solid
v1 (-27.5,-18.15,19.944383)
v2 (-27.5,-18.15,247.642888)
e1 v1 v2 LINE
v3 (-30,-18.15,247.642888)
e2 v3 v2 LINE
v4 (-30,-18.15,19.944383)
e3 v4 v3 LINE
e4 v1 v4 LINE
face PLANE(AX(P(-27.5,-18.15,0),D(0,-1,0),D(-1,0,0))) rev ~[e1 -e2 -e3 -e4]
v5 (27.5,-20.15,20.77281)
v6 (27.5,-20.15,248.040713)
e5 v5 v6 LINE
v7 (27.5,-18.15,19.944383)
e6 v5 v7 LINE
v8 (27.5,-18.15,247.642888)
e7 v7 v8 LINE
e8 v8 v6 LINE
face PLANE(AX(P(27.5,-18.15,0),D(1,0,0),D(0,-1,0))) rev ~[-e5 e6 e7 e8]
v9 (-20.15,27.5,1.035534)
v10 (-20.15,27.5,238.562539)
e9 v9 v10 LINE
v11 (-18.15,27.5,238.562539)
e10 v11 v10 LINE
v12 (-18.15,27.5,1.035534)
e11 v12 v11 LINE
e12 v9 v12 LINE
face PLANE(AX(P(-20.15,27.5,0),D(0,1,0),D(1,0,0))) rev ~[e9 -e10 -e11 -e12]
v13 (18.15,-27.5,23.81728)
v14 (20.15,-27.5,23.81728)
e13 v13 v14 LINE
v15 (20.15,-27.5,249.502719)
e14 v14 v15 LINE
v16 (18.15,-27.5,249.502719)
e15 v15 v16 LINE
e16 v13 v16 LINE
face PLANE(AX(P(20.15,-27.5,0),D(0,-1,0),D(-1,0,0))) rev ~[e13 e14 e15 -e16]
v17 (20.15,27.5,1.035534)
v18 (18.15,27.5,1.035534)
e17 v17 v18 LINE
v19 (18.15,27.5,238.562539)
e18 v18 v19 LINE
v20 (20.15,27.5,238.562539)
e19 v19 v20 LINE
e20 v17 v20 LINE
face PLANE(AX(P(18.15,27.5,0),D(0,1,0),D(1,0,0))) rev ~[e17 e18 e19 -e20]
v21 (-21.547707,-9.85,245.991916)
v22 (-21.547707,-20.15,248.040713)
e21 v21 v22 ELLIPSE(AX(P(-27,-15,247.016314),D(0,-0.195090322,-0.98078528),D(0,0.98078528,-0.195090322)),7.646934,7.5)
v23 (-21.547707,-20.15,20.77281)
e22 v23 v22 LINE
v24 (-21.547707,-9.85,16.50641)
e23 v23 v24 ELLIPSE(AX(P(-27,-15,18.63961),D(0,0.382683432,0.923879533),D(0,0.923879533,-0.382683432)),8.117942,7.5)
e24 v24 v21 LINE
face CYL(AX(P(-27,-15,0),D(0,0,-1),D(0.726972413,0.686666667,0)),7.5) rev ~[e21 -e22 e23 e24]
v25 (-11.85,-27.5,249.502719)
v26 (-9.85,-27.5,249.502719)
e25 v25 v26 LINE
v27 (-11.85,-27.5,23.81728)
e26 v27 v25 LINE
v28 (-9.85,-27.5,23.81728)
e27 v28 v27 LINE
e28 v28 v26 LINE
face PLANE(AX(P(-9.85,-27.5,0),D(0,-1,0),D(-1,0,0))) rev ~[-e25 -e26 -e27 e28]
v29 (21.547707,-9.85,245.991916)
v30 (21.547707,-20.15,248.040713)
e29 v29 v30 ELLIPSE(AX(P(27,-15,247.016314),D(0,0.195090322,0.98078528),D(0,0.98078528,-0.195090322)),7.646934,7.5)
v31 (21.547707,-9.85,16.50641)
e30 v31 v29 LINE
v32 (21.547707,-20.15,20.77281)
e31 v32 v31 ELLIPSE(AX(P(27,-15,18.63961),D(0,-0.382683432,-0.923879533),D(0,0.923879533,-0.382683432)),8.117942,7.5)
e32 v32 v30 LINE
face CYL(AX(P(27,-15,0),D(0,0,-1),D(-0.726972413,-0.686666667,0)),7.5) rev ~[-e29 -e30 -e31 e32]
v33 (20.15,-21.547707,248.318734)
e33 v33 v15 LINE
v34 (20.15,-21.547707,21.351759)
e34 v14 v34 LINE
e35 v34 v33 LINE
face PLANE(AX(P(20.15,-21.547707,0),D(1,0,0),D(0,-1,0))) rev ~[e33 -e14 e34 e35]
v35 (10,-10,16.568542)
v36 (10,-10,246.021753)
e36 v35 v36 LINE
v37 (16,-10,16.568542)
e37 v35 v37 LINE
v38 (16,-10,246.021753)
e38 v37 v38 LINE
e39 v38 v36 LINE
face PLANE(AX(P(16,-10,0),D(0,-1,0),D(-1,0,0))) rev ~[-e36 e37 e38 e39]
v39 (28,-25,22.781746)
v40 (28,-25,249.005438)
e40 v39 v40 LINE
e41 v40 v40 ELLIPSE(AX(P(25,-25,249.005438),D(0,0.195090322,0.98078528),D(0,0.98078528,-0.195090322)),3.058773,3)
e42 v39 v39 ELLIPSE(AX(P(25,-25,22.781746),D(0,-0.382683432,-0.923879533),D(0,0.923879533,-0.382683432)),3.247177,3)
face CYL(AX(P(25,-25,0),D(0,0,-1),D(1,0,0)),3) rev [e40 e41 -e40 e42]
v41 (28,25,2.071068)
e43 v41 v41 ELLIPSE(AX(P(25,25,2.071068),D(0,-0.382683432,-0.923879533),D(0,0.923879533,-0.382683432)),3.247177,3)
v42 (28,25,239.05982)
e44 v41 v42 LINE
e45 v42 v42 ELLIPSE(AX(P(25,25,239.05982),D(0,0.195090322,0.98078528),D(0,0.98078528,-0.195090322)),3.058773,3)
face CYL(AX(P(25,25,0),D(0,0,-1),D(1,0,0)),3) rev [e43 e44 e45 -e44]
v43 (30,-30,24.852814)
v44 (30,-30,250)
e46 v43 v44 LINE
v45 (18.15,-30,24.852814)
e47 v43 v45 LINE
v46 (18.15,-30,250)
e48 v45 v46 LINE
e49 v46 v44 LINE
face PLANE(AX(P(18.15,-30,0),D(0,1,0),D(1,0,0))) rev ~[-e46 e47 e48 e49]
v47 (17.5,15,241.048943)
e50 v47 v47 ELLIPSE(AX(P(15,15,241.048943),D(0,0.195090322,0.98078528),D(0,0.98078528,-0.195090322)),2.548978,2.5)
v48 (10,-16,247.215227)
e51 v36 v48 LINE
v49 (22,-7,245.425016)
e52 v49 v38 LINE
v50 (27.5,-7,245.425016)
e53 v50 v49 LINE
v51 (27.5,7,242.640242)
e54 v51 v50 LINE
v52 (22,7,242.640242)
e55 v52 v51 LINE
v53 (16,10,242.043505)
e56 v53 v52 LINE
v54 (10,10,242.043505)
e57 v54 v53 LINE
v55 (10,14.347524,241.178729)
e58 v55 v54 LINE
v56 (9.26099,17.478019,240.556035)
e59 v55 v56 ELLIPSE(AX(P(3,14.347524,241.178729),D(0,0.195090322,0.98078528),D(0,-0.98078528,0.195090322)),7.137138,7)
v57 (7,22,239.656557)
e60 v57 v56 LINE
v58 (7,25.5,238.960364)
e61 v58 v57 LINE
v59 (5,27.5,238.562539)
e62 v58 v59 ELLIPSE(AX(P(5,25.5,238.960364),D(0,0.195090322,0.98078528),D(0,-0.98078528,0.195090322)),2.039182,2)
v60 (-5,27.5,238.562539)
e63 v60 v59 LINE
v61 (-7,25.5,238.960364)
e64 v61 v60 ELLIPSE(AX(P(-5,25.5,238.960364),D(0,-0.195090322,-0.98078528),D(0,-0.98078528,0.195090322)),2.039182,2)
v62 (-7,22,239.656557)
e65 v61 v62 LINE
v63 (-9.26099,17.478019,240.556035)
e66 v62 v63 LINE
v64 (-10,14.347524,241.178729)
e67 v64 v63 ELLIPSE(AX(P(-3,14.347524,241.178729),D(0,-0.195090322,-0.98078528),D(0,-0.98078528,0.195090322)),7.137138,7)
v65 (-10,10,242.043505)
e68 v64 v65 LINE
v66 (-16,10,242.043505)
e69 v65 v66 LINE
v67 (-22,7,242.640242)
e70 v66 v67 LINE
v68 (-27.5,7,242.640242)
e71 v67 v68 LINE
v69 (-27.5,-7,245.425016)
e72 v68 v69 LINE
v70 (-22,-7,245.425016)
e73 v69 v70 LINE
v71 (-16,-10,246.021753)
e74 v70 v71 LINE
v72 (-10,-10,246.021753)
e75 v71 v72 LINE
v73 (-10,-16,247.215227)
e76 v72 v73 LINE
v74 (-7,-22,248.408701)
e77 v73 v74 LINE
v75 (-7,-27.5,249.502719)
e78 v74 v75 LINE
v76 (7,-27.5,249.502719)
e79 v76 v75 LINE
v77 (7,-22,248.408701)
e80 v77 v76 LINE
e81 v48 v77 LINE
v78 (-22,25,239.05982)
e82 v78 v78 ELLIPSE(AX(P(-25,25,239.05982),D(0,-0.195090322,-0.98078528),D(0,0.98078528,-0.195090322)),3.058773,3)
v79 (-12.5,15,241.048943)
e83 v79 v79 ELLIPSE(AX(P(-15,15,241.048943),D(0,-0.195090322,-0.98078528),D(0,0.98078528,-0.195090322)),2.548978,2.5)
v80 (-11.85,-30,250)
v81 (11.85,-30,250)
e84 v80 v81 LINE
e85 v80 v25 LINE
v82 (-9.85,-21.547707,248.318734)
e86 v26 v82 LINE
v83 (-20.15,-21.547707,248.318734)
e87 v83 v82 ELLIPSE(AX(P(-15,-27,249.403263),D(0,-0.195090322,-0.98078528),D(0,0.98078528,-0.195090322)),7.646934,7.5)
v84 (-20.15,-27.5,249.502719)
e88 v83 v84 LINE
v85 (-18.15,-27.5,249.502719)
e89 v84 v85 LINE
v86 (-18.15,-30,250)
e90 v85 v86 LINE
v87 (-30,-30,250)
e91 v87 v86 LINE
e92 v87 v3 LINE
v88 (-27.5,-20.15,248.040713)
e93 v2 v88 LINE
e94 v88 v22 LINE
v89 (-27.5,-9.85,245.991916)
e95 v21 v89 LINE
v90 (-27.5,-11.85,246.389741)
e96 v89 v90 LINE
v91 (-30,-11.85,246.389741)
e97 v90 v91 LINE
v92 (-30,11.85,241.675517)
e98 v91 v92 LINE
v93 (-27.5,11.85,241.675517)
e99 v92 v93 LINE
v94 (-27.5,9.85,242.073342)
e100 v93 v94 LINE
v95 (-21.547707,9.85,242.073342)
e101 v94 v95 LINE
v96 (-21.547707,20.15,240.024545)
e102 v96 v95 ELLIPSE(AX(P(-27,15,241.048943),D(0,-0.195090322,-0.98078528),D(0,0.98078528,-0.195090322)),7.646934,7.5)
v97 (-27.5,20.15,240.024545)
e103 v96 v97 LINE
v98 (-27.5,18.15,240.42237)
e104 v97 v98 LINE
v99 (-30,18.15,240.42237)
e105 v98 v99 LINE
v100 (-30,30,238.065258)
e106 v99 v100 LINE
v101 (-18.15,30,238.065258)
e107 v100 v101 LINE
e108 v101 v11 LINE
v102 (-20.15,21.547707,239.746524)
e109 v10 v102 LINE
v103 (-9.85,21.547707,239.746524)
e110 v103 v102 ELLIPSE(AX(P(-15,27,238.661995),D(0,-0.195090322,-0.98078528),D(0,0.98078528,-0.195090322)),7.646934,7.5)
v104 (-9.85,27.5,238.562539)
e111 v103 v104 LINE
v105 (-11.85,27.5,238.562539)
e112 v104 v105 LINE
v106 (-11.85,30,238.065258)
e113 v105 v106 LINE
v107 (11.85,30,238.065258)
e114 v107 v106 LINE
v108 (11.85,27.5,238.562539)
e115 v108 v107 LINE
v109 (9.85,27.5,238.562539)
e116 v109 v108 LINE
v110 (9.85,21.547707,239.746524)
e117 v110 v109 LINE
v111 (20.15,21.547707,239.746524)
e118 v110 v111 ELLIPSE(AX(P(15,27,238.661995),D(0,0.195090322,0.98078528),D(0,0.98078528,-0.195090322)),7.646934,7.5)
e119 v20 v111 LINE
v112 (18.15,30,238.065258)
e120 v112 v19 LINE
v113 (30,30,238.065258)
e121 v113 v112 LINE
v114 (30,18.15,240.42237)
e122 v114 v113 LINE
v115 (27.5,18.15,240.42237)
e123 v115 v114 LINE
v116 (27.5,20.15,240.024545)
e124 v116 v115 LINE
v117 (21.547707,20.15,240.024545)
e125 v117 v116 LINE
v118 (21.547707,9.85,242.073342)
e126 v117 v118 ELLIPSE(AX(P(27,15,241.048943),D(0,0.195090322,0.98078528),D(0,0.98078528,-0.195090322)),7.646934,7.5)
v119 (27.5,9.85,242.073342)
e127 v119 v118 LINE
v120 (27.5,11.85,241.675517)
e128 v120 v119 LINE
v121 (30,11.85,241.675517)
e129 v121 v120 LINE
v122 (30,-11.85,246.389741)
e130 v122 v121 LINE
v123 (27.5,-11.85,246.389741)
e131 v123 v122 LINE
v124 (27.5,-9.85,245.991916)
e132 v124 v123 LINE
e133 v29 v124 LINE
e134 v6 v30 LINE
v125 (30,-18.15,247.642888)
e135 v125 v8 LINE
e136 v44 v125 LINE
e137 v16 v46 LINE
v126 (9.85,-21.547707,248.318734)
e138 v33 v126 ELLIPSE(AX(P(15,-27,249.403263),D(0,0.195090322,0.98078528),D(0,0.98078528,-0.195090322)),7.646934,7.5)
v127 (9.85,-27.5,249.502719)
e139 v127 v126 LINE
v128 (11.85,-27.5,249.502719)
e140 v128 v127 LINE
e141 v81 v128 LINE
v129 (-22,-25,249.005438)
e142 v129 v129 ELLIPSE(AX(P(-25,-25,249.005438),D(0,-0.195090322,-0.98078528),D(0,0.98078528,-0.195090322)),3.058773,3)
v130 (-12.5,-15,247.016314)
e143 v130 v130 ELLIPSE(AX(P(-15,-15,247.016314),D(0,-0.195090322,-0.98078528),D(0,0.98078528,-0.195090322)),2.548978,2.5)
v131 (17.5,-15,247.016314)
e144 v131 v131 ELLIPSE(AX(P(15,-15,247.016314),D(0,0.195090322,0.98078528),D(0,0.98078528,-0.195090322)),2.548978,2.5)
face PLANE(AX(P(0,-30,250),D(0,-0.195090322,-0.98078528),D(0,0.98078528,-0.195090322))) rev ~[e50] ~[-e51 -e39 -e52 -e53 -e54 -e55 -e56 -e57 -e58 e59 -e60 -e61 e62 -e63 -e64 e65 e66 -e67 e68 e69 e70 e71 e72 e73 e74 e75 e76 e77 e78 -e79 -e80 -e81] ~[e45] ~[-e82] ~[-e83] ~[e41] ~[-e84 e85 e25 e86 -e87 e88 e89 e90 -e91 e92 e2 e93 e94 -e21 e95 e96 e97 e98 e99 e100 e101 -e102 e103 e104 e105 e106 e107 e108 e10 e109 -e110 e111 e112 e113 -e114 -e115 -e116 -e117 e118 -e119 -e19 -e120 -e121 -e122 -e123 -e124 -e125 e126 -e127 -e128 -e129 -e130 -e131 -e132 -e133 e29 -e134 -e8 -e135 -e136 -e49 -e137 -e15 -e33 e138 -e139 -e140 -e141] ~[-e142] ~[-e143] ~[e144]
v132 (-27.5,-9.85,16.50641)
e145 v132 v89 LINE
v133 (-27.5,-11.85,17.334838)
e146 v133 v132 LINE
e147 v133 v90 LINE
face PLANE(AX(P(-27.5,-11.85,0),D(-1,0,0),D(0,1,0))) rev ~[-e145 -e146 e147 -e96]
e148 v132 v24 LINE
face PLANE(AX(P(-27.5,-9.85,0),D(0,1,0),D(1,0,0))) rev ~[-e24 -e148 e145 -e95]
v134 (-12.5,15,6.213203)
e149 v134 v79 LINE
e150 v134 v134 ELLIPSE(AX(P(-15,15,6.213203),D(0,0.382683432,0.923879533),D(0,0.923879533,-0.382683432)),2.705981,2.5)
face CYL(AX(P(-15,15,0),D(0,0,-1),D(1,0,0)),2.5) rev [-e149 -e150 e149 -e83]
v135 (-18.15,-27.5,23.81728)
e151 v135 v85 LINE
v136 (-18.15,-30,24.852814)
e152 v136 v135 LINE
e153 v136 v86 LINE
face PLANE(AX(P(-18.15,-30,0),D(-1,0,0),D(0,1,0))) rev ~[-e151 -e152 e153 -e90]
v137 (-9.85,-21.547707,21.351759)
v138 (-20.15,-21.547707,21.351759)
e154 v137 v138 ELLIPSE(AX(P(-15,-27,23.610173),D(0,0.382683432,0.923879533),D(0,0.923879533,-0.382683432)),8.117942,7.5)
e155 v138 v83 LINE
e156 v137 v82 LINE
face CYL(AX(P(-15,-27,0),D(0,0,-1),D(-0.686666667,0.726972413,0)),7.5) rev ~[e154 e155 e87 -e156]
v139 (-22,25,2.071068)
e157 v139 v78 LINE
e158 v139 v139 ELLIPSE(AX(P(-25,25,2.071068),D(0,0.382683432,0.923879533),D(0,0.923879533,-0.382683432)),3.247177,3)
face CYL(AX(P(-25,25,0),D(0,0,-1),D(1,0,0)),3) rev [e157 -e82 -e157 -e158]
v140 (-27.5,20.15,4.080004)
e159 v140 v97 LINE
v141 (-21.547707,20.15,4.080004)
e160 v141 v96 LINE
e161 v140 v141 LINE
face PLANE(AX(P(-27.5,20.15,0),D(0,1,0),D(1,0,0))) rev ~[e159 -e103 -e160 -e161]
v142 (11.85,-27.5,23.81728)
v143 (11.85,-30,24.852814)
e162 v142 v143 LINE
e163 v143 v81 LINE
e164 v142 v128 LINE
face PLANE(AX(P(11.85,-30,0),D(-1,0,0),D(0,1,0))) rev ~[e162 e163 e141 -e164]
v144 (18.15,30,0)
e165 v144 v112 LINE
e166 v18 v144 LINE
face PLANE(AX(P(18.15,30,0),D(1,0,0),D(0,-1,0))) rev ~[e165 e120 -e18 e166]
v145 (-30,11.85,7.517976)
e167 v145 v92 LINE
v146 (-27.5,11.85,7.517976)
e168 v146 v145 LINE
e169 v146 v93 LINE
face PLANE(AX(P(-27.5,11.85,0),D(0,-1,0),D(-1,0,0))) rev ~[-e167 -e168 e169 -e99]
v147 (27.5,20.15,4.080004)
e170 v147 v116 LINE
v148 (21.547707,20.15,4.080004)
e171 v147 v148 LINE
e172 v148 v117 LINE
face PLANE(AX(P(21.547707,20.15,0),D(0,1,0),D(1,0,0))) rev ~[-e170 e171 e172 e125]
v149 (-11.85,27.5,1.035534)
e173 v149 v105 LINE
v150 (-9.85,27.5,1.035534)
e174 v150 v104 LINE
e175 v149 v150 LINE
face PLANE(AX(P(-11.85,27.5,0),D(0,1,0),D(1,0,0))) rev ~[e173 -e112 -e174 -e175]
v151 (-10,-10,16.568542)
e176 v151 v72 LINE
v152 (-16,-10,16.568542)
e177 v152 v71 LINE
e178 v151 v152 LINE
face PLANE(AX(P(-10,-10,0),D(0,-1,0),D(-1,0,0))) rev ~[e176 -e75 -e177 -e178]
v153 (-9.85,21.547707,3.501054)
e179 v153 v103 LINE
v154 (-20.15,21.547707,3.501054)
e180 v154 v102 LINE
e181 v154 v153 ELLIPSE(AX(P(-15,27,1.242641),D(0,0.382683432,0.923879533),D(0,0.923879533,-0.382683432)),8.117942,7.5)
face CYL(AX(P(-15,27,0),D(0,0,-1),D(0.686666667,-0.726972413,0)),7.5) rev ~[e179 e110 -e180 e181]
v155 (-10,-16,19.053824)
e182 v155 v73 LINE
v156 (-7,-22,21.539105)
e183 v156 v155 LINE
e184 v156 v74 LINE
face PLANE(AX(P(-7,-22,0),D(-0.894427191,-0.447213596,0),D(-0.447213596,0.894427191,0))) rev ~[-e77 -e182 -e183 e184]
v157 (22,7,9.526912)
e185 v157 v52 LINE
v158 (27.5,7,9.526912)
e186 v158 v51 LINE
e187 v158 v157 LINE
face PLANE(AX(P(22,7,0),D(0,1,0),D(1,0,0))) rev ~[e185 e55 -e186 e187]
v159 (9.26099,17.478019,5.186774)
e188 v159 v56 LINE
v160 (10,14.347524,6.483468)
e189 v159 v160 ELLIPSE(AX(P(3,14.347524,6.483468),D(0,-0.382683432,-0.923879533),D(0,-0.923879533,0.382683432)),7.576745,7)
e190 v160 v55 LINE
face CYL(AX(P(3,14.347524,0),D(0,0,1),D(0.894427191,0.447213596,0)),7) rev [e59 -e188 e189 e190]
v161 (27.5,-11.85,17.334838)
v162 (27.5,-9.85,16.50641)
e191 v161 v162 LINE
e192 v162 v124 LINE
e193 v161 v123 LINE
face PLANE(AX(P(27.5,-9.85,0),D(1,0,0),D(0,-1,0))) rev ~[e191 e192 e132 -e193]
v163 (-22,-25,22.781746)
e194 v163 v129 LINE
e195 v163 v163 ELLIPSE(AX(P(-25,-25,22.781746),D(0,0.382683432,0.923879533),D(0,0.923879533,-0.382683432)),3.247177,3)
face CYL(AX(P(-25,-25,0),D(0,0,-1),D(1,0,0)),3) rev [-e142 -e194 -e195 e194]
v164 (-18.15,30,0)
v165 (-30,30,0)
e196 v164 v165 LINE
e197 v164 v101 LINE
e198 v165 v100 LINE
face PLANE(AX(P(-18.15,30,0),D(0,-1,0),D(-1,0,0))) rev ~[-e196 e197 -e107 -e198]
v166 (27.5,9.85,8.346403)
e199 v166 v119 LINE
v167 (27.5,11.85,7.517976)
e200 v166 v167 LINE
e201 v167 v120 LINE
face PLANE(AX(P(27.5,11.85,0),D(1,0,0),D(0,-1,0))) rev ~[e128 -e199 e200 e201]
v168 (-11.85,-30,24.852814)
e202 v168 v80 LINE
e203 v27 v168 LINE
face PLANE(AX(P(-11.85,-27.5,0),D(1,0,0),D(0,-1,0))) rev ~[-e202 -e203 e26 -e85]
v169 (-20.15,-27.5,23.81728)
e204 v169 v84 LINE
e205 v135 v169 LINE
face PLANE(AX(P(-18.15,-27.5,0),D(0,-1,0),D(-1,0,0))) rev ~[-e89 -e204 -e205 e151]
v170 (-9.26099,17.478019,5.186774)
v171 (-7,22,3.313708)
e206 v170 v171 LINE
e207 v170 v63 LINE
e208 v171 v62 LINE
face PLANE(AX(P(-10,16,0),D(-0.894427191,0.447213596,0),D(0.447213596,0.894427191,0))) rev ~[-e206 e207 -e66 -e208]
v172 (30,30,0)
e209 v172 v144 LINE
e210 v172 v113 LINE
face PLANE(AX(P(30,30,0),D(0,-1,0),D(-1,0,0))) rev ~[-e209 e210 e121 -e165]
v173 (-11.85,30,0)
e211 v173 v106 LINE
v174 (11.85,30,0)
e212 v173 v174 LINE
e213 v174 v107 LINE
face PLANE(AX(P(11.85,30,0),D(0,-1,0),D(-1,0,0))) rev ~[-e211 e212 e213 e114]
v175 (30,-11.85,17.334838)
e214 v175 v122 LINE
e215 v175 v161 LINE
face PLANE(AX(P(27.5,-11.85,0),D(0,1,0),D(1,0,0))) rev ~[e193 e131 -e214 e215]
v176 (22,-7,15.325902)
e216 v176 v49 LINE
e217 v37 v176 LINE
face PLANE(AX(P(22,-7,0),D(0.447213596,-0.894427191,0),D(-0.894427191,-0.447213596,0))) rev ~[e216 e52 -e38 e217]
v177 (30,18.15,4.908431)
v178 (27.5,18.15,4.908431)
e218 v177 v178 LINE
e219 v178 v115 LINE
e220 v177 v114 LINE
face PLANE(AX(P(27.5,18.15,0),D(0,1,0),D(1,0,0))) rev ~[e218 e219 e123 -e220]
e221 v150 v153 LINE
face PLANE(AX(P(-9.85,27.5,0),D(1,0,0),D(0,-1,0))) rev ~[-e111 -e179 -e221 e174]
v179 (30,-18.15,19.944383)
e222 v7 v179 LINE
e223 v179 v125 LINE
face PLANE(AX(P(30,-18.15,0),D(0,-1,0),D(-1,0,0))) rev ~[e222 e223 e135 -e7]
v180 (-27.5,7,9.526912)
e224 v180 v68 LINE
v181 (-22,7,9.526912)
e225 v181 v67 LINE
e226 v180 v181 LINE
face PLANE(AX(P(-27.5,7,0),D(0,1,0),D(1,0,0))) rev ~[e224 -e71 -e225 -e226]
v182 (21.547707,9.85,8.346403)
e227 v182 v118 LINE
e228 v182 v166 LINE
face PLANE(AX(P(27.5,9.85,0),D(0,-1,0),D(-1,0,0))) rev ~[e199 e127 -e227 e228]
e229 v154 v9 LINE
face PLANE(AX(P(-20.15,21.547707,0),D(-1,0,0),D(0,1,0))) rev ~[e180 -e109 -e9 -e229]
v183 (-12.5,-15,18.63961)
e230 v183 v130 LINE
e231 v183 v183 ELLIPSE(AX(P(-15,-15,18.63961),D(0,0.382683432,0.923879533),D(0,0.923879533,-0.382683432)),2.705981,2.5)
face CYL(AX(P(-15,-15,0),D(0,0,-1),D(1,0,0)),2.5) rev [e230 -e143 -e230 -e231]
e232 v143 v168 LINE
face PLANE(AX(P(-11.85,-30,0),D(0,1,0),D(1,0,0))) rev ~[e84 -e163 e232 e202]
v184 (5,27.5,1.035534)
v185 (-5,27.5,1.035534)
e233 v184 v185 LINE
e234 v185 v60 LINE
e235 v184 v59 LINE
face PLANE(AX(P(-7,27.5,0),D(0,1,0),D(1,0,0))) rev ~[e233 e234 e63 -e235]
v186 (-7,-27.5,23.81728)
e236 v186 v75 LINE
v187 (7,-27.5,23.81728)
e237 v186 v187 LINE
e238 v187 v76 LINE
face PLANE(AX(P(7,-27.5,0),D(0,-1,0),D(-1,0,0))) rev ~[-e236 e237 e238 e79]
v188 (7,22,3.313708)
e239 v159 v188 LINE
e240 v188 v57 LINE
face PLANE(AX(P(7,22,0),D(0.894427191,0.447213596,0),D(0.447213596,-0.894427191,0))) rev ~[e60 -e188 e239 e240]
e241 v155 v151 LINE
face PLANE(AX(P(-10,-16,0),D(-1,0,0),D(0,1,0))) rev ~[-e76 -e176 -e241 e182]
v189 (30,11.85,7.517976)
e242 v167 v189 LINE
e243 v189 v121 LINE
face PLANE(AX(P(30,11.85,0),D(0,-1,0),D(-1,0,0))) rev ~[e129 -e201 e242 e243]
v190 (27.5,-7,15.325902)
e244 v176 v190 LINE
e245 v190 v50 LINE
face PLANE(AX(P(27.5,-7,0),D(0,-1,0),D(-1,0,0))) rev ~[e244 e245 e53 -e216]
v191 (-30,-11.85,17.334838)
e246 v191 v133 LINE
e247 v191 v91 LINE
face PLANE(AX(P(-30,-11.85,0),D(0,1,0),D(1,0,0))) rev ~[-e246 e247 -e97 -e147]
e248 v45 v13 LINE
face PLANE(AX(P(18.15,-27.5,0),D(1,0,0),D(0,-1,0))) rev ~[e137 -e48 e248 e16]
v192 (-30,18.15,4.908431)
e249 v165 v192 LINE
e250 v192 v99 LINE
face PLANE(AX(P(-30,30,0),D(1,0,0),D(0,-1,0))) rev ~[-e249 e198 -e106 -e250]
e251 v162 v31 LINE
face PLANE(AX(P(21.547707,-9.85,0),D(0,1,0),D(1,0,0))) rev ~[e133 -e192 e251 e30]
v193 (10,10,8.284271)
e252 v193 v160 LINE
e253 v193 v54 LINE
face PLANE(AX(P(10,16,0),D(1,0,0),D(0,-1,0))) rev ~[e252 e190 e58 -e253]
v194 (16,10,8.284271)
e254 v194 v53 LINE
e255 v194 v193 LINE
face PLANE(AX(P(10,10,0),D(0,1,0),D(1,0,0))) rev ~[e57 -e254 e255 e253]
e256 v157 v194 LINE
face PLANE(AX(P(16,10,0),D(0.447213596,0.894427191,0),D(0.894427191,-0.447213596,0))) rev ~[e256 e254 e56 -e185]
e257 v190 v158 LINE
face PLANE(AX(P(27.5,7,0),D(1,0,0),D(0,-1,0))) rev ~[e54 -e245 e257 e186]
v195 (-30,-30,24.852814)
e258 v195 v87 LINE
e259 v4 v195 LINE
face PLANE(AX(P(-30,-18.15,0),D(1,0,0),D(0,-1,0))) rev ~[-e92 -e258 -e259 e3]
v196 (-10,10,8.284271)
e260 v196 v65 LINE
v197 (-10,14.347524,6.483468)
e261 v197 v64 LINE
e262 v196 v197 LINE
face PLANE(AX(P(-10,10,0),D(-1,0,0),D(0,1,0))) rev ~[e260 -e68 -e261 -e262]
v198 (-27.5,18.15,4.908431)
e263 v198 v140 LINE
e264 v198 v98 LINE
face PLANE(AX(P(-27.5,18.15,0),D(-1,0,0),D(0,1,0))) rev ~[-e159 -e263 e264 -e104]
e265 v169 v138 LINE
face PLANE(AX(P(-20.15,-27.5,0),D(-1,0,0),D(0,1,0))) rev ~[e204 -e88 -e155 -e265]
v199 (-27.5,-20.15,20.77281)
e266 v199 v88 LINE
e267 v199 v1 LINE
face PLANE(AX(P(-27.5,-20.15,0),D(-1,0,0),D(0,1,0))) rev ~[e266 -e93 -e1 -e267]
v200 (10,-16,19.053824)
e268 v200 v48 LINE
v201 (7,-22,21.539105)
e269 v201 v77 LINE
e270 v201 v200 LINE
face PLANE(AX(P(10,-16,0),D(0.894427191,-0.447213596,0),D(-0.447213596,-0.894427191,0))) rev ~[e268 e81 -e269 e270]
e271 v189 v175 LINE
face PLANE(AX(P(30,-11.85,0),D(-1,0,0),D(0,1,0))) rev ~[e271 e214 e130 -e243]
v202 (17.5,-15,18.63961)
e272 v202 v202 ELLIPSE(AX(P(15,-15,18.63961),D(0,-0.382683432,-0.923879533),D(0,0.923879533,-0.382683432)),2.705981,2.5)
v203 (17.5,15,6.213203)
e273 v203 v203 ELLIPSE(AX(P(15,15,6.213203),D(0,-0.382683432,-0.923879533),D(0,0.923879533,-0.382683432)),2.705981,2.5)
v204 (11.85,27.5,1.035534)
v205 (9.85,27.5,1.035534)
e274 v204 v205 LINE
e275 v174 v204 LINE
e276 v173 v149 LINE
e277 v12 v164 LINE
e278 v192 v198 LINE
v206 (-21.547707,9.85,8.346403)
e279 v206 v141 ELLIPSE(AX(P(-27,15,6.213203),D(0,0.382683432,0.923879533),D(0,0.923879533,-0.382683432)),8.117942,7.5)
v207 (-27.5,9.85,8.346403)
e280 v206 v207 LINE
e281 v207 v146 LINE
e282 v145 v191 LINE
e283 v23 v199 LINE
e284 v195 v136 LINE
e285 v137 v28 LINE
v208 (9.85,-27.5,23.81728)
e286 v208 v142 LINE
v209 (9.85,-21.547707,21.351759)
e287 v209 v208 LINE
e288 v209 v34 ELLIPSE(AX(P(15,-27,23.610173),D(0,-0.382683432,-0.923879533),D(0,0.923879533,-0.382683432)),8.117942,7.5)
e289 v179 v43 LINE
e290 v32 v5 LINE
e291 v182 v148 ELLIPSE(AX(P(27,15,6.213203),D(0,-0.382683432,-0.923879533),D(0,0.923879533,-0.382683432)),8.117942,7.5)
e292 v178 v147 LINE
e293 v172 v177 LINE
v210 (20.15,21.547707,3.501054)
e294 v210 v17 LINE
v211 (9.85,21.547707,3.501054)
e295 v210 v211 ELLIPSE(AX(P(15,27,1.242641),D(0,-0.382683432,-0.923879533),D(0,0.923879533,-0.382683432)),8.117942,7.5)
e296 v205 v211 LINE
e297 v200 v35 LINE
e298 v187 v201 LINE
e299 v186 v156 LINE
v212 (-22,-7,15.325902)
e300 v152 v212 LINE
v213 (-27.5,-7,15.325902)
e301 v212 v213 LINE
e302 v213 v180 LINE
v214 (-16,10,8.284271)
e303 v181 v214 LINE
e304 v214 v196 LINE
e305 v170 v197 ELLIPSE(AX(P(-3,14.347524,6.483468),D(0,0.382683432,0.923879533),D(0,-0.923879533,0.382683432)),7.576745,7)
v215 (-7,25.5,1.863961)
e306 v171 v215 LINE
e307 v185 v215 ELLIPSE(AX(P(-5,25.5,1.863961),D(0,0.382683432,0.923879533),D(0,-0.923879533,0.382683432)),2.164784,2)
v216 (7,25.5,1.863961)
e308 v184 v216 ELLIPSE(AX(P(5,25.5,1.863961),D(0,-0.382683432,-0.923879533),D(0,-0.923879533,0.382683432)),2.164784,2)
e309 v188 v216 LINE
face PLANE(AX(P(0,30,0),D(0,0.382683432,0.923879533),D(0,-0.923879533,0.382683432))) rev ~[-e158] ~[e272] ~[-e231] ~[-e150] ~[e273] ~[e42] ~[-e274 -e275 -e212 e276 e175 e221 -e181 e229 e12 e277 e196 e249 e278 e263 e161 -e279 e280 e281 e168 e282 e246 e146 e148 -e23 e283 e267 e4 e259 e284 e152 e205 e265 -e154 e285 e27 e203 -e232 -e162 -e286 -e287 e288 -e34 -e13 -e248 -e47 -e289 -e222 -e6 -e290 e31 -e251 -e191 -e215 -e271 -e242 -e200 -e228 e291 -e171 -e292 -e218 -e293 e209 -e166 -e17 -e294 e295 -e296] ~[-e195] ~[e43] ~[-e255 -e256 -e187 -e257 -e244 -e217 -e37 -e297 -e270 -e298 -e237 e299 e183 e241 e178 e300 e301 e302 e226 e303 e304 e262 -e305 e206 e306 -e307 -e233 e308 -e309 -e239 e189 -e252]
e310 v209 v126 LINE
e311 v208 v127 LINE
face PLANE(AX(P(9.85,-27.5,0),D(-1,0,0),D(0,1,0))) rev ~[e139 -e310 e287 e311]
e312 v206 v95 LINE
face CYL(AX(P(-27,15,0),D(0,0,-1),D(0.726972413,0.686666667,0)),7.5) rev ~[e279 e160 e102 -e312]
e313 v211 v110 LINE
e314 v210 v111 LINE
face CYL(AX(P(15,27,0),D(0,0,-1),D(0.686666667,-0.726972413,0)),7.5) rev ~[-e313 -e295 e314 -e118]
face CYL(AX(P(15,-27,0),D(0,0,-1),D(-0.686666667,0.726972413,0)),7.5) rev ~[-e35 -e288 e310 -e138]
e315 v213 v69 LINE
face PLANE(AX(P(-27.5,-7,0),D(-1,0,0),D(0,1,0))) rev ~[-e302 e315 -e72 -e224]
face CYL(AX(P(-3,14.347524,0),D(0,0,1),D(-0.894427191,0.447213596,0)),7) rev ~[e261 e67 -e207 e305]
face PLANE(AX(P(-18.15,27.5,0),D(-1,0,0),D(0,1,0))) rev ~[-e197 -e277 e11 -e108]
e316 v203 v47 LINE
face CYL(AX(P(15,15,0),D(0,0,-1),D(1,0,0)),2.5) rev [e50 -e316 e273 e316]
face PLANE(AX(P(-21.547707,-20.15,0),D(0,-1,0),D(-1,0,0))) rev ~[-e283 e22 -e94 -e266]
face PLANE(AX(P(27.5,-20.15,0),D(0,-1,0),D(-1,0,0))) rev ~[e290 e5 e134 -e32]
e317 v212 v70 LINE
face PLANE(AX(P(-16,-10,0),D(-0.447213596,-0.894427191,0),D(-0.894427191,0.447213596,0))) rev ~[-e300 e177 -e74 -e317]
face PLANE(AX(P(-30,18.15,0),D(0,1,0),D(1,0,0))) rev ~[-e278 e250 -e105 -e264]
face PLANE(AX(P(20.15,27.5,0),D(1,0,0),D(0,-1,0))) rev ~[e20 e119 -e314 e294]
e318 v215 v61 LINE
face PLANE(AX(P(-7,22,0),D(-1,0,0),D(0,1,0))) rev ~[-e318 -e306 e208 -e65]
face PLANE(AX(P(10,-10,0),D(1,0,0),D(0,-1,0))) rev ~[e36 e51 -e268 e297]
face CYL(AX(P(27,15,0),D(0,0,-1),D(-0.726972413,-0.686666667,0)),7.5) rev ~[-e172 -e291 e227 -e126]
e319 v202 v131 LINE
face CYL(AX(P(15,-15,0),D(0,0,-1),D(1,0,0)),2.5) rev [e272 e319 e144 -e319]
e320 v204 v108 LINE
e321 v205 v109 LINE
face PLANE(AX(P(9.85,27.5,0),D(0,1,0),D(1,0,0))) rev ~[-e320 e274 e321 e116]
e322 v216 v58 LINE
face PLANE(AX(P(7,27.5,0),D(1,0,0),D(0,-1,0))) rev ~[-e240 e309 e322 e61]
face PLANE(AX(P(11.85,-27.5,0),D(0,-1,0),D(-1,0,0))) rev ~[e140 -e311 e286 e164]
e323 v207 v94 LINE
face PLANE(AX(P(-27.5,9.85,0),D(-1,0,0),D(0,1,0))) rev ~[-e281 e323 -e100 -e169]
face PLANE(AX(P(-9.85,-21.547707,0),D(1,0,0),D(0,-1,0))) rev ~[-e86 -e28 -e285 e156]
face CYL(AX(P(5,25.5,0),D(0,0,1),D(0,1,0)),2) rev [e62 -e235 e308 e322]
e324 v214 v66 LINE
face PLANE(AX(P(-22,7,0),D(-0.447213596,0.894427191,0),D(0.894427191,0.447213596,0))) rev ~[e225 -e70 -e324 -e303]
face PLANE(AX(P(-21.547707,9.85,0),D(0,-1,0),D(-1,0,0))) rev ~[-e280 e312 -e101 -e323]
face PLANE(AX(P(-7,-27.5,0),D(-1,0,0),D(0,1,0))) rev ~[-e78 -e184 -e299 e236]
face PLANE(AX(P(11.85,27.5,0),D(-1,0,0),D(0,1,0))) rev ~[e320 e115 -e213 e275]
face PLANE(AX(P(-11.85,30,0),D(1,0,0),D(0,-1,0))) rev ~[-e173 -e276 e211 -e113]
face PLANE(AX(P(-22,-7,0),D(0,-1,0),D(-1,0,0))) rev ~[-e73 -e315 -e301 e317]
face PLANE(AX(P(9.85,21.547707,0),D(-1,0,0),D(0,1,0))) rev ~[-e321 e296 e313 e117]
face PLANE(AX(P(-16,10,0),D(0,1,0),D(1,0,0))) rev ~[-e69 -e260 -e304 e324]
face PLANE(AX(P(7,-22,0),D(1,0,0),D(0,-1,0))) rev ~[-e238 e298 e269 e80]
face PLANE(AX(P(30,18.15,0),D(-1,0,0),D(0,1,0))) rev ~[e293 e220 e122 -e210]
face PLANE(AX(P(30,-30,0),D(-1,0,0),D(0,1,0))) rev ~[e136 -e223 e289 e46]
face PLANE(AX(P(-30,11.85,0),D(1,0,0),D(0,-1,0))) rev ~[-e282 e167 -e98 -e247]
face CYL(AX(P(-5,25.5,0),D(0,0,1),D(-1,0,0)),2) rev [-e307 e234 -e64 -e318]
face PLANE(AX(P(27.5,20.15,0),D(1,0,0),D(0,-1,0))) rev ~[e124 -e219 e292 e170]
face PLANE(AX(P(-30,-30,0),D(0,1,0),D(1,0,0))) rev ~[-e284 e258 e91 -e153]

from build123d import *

# Parameters (mm, degrees)
F0_R          = 3
F0_R_2        = 2.5
F1_DEPTH      = 250
F2_R          = 2
F3_R          = 7
F5_DEPTH      = 30
F5_DEPTH_BACK = 30


# Not quite as in the source:
# - a feature names something its author has since deleted; it is built from what else it names


with BuildPart() as f1:
    # F0 (on Top) → F1 (new body)
    with BuildSketch(Plane.XY):
        with BuildLine():
            Line((18.15, -30), (30, -30))
            Line((30, -30), (30, -18.15))
            Line((30, -18.15), (27.5, -18.15))
            Line((27.5, -18.15), (27.5, -20.15))
            Line((27.5, -20.15), (21.5477069044, -20.15))
            ThreePointArc((21.5477069044, -20.15), (19.5, -15), (21.5477069044, -9.85))
            Line((21.5477069044, -9.85), (27.5, -9.85))
            Line((27.5, -9.85), (27.5, -11.85))
            Line((27.5, -11.85), (30, -11.85))
            Line((30, -11.85), (30, 11.85))
            Line((30, 11.85), (27.5, 11.85))
            Line((27.5, 11.85), (27.5, 9.85))
            Line((27.5, 9.85), (21.5477069044, 9.85))
            ThreePointArc((21.5477069044, 9.85), (19.5, 15), (21.5477069044, 20.15))
            Line((21.5477069044, 20.15), (27.5, 20.15))
            Line((27.5, 20.15), (27.5, 18.15))
            Line((27.5, 18.15), (30, 18.15))
            Line((30, 18.15), (30, 30))
            Line((30, 30), (18.15, 30))
            Line((18.15, 30), (18.15, 27.5))
            Line((18.15, 27.5), (20.15, 27.5))
            Line((20.15, 27.5), (20.15, 21.5477069044))
            ThreePointArc((20.15, 21.5477069044), (15, 19.5), (9.85, 21.5477069044))
            Line((9.85, 21.5477069044), (9.85, 27.5))
            Line((9.85, 27.5), (11.85, 27.5))
            Line((11.85, 27.5), (11.85, 30))
            Line((11.85, 30), (-11.85, 30))
            Line((-11.85, 30), (-11.85, 27.5))
            Line((-11.85, 27.5), (-9.85, 27.5))
            Line((-9.85, 27.5), (-9.85, 21.5477069044))
            ThreePointArc((-9.85, 21.5477069044), (-15, 19.5), (-20.15, 21.5477069044))
            Line((-20.15, 21.5477069044), (-20.15, 27.5))
            Line((-20.15, 27.5), (-18.15, 27.5))
            Line((-18.15, 27.5), (-18.15, 30))
            Line((-18.15, 30), (-30, 30))
            Line((-30, 30), (-30, 18.15))
            Line((-30, 18.15), (-27.5, 18.15))
            Line((-27.5, 18.15), (-27.5, 20.15))
            Line((-27.5, 20.15), (-21.5477069044, 20.15))
            ThreePointArc((-21.5477069044, 20.15), (-19.5, 15), (-21.5477069044, 9.85))
            Line((-21.5477069044, 9.85), (-27.5, 9.85))
            Line((-27.5, 9.85), (-27.5, 11.85))
            Line((-27.5, 11.85), (-30, 11.85))
            Line((-30, 11.85), (-30, -11.85))
            Line((-30, -11.85), (-27.5, -11.85))
            Line((-27.5, -11.85), (-27.5, -9.85))
            Line((-27.5, -9.85), (-21.5477069044, -9.85))
            ThreePointArc((-21.5477069044, -9.85), (-19.5, -15), (-21.5477069044, -20.15))
            Line((-21.5477069044, -20.15), (-27.5, -20.15))
            Line((-27.5, -20.15), (-27.5, -18.15))
            Line((-27.5, -18.15), (-30, -18.15))
            Line((-30, -18.15), (-30, -30))
            Line((-30, -30), (-18.15, -30))
            Line((-18.15, -30), (-18.15, -27.5))
            Line((-18.15, -27.5), (-20.15, -27.5))
            Line((-20.15, -27.5), (-20.15, -21.5477069044))
            ThreePointArc((-20.15, -21.5477069044), (-15, -19.5), (-9.85, -21.5477069044))
            Line((-9.85, -21.5477069044), (-9.85, -27.5))
            Line((-9.85, -27.5), (-11.85, -27.5))
            Line((-11.85, -27.5), (-11.85, -30))
            Line((-11.85, -30), (11.85, -30))
            Line((11.85, -30), (11.85, -27.5))
            Line((11.85, -27.5), (9.85, -27.5))
            Line((9.85, -27.5), (9.85, -21.5477069044))
            ThreePointArc((9.85, -21.5477069044), (15, -19.5), (20.15, -21.5477069044))
            Line((20.15, -21.5477069044), (20.15, -27.5))
            Line((20.15, -27.5), (18.15, -27.5))
            Line((18.15, -27.5), (18.15, -30))
        make_face()
        with Locations((-25, -25)):
            Circle(F0_R, mode=Mode.SUBTRACT)
        with Locations((-15, -15)):
            Circle(F0_R_2, mode=Mode.SUBTRACT)
        with Locations((25, -25)):
            Circle(F0_R, mode=Mode.SUBTRACT)
        with Locations((15, -15)):
            Circle(F0_R_2, mode=Mode.SUBTRACT)
        with Locations((-25, 25)):
            Circle(F0_R, mode=Mode.SUBTRACT)
        with Locations((-15, 15)):
            Circle(F0_R_2, mode=Mode.SUBTRACT)
        Polygon((-7, 22), (-7, 27.5), (0, 27.5), (7, 27.5), (7, 22), (10, 16), (10, 10), (16, 10), (22, 7), (27.5, 7), (27.5, 0), (27.5, -7), (22, -7), (16, -10), (10, -10), (10, -16), (7, -22), (7, -27.5), (0, -27.5), (-7, -27.5), (-7, -22), (-10, -16), (-10, -10), (-16, -10), (-22, -7), (-27.5, -7), (-27.5, 0), (-27.5, 7), (-22, 7), (-16, 10), (-10, 10), (-10, 16), align=None, mode=Mode.SUBTRACT)
        with Locations((15, 15)):
            Circle(F0_R_2, mode=Mode.SUBTRACT)
        with Locations((25, 25)):
            Circle(F0_R, mode=Mode.SUBTRACT)
    extrude(amount=F1_DEPTH)

    # F2
    f2_edges = [f1.edges().sort_by_distance(p)[0] for p in [
        (-7, 27.5, 125),
        (7, 27.5, 125),
    ]]
    fillet(f2_edges, radius=F2_R)

    # F3
    f3_edges = [f1.edges().sort_by_distance(p)[0] for p in [
        (-10, 16, 125),
        (10, 16, 125),
    ]]
    fillet(f3_edges, radius=F3_R)

    # F4 (on Right) → F5 (cut, two sides)
    with BuildSketch(Plane.YZ) as f5_sk:
        Polygon((-23.2563562234, -128.5722174771), (30, 0), (-168.5306378236, 82.2340827331), (-221.786994047, -46.338134744), align=None)
        Polygon((171.7491592878, 324.7994275924), (-8.0091289948, 360.5555742708), (-30, 250), (149.7582882826, 214.2438533216), align=None)
    extrude(amount=F5_DEPTH, mode=Mode.SUBTRACT)
    extrude(f5_sk.sketch, amount=-F5_DEPTH_BACK, mode=Mode.SUBTRACT)


solid = f1.part
